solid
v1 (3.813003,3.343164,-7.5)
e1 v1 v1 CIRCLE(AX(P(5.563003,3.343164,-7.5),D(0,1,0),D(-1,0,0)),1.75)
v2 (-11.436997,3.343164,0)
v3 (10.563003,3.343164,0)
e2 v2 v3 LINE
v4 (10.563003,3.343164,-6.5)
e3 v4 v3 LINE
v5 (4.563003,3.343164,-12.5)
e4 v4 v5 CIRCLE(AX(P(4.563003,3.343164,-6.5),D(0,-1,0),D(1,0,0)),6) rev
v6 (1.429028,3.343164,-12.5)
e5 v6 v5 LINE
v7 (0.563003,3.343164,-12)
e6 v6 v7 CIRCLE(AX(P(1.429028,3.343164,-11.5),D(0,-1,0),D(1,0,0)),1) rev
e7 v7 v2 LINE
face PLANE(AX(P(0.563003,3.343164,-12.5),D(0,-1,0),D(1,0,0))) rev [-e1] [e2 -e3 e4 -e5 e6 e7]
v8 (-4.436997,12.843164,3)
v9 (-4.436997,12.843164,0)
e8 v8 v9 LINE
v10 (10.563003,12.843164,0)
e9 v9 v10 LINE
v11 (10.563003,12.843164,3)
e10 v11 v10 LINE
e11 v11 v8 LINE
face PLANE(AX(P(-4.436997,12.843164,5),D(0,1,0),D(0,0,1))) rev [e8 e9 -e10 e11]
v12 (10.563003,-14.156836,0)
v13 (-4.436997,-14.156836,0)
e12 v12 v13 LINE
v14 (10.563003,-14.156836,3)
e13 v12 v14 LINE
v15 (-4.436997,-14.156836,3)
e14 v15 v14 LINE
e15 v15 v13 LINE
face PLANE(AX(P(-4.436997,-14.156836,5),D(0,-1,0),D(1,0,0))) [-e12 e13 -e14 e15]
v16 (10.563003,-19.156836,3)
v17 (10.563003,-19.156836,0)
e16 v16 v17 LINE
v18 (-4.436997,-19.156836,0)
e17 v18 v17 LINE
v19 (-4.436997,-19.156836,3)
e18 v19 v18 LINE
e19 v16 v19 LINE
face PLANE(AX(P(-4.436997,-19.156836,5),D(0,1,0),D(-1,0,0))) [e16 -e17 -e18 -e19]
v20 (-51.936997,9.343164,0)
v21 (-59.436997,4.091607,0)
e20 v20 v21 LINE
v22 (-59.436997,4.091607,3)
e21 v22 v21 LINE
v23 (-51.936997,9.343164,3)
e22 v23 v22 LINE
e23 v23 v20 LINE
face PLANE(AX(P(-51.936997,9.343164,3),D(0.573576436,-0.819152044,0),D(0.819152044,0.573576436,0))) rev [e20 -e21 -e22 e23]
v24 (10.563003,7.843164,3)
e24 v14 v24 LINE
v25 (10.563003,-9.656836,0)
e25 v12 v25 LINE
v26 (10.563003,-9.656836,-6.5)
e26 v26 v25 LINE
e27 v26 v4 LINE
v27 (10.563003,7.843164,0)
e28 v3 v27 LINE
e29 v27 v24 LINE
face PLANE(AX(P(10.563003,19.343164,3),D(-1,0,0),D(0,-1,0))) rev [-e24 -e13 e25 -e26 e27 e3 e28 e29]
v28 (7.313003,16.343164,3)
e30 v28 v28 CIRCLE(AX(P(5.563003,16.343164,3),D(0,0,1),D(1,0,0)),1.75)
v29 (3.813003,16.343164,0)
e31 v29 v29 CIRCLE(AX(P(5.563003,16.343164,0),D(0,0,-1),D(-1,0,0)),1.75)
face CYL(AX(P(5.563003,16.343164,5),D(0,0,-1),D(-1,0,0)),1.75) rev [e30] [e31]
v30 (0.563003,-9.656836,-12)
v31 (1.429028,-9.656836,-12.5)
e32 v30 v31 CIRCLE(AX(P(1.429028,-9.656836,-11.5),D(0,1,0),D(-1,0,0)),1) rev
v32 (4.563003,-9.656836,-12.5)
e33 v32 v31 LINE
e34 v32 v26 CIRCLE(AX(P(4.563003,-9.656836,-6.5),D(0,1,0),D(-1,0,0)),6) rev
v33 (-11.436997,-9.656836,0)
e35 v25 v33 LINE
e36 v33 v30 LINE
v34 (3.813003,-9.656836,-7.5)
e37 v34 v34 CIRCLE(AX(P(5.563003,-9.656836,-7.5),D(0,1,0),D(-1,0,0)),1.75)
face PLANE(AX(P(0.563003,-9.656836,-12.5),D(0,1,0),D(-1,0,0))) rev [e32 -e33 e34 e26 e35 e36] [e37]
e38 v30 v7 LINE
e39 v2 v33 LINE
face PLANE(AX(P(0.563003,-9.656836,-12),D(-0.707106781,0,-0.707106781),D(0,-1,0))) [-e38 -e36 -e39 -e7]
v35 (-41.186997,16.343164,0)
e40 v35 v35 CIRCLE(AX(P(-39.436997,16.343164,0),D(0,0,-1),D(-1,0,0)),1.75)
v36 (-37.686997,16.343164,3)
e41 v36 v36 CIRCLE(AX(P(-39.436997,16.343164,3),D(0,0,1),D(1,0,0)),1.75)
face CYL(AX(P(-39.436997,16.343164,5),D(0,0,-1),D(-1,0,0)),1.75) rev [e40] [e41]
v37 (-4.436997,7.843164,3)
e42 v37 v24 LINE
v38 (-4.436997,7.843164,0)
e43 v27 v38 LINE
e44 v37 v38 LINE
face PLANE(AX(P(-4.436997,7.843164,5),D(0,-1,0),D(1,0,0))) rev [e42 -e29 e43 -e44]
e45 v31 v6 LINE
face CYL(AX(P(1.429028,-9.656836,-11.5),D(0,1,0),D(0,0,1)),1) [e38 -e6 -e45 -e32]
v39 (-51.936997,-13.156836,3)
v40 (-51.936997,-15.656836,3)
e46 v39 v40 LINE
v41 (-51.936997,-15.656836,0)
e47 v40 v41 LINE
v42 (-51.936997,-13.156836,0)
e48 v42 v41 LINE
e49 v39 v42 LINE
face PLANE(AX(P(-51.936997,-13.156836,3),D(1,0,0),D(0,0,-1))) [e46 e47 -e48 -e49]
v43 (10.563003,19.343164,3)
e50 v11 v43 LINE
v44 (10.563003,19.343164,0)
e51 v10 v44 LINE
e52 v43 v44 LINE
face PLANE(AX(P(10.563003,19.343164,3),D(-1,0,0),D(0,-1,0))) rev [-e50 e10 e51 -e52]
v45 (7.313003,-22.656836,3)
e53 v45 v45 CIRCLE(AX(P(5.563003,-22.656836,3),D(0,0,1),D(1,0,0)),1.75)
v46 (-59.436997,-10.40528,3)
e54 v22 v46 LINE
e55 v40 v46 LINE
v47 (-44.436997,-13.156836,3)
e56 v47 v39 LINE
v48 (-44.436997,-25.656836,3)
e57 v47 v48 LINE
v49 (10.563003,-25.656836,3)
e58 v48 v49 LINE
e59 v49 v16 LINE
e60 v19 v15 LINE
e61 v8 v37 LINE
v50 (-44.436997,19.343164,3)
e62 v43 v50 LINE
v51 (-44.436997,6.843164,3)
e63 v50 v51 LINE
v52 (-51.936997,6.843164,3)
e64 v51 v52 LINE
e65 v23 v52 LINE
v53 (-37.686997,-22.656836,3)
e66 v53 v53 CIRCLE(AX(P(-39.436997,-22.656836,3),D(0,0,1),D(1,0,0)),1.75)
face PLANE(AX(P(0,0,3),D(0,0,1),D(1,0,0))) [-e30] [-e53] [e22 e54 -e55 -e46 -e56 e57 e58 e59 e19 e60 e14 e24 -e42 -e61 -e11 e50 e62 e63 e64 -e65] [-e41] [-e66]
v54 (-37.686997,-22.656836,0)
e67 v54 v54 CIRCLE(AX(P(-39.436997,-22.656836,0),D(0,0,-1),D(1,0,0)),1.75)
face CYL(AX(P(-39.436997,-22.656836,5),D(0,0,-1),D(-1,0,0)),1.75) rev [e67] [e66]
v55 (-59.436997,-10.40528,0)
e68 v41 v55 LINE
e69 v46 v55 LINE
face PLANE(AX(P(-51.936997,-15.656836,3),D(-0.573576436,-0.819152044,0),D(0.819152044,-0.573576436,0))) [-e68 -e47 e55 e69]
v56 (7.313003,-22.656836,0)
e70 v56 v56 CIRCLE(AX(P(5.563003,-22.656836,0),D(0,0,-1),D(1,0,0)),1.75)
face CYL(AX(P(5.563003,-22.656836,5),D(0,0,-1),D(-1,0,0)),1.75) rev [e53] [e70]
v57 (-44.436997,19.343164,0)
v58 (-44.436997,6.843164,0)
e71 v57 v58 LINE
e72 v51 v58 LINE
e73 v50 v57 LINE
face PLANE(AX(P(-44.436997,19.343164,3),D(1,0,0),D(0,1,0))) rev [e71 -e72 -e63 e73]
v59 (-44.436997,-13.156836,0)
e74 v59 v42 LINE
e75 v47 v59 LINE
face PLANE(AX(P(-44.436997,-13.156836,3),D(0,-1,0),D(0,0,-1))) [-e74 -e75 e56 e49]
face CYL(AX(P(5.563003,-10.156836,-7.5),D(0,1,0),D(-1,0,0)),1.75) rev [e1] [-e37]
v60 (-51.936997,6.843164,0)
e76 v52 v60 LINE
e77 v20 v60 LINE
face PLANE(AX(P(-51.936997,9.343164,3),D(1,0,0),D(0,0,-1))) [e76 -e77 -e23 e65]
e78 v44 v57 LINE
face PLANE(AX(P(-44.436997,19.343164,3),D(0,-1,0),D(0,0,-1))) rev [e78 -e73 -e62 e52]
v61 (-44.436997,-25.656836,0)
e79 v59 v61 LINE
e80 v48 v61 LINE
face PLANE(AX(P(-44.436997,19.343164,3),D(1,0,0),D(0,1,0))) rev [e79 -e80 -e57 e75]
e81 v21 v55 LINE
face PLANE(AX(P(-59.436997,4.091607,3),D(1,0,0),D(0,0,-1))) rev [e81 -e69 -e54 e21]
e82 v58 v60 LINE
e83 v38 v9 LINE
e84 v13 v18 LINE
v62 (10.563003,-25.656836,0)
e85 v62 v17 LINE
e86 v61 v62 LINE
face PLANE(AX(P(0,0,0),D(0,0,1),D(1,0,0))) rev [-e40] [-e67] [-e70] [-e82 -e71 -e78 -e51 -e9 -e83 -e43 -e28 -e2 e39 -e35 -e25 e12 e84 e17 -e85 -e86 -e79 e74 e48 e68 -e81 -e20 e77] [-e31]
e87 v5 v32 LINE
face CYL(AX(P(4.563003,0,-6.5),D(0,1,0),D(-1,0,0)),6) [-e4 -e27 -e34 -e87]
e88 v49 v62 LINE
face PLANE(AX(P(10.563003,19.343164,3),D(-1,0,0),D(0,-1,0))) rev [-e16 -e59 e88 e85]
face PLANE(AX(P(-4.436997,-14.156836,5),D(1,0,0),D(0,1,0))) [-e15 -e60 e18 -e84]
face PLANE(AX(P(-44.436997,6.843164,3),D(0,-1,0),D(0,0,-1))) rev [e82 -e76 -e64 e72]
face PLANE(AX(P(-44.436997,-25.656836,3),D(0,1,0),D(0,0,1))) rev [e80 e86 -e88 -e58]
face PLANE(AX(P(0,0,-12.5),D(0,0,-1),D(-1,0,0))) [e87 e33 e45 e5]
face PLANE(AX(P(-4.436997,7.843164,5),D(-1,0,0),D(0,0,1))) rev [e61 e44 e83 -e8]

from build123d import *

# Parameters (mm, degrees)
SKETCH1_W           = 55
SKETCH1_H           = 45
BOSS_EXTRUDE1_DEPTH = 3
SKETCH2_W           = 10
SKETCH2_H           = 13
BOSS_EXTRUDE2_DEPTH = 12.5
SKETCH3_R           = 1.75
CUT_EXTRUDE1_DEPTH  = 13.5
FILLET1_R           = 6
CHAMFER1_SIZE       = 12
FILLET3_R           = 1
SKETCH4_W           = 20
SKETCH4_H           = 5
CUT_EXTRUDE3_DEPTH  = 5
SKETCH7_R           = 1.75
CUT_EXTRUDE4_DEPTH  = 5
BOSS_EXTRUDE4_DEPTH = 3


with BuildPart() as part:
    # Sketch1 → Boss-Extrude1 (new body)
    with BuildSketch(Plane.XY):
        with Locations((-16.936997319, -3.156836461)):
            Rectangle(SKETCH1_W, SKETCH1_H)
    extrude(amount=BOSS_EXTRUDE1_DEPTH)

    # Sketch2 → Boss-Extrude2 (add)
    with BuildSketch(Plane(origin=(0, 0, 0), x_dir=(-1, 0, 0), z_dir=(0, 0, -1))):
        with Locations((-5.563002681, -3.156836461)):
            Rectangle(SKETCH2_W, SKETCH2_H)
    extrude(amount=BOSS_EXTRUDE2_DEPTH)

    # Sketch3 → Cut-Extrude1 (cut)
    with BuildSketch(Plane(origin=(0, 3.343163539, 0), x_dir=(1, 0, 0), z_dir=(0, 1, 0))):
        with Locations(Location((5.563002681, 7.5, 0), (0, 0, 180))):
            Circle(SKETCH3_R)
    extrude(amount=-CUT_EXTRUDE1_DEPTH, mode=Mode.SUBTRACT)

    # Fillet1
    fillet1_edges = [part.edges().sort_by_distance(p)[0] for p in [
        (10.563002681, -3.156836461, -12.5),
    ]]
    fillet(fillet1_edges, radius=FILLET1_R)

    # Chamfer1
    chamfer1_edges = [part.edges().sort_by_distance(p)[0] for p in [
        (0.563002681, -3.156836461, 0),
    ]]
    chamfer(chamfer1_edges, length=CHAMFER1_SIZE)

    # Fillet3
    # the kernel refuses this fillet: 1 mm, written as the material it takes off along each edge
    with BuildSketch(Plane(origin=(0.563002681, 5.508227048, -12.5), x_dir=(1, 0, 0), z_dir=(0, -1, 0))) as fillet3_piece_1:
        with BuildLine():
            CenterArc((0.866025404, 1), FILLET3_R, 210, 60)
            Line((0, 0.5), (-0.017320508, 0.49))
            ThreePointArc((-0.017320508, 0.49), (-0.02, 0.25), (-0.02, 0))
            Line((-0.02, 0), (0, -0.02))
            Line((0, -0.02), (0.866025404, -0.02))
            Line((0.866025404, -0.02), (0.866025404, 0))
        make_face()
    extrude(amount=17.330127019, mode=Mode.SUBTRACT)

    # Sketch4 → Cut-Extrude3 (cut)
    with BuildSketch(Plane(origin=(0, 0, 0), x_dir=(-1, 0, 0), z_dir=(0, 0, -1))):
        with Locations((-5.563002681, 10.343163539)):
            Rectangle(SKETCH4_W, SKETCH4_H)
    cut_extrude3 = extrude(amount=-CUT_EXTRUDE3_DEPTH, mode=Mode.SUBTRACT)

    # Mirror2: Cut-Extrude3 across plane
    add(cut_extrude3.mirror(Plane.ZX.offset(-3.156836461)), mode=Mode.SUBTRACT)

    # Sketch7 → Cut-Extrude4 (cut)
    with BuildSketch(Plane(origin=(0, 0, 0), x_dir=(-1, 0, 0), z_dir=(0, 0, -1))):
        with Locations((-5.563002681, 16.343163539)):
            Circle(SKETCH7_R)
        with Locations((39.436997319, 16.343163539)):
            Circle(SKETCH7_R)
        with Locations(Location((39.436997319, -22.656836461, 0), (0, 0, 180))):
            Circle(SKETCH7_R)
        with Locations(Location((-5.563002681, -22.656836461, 0), (0, 0, 180))):
            Circle(SKETCH7_R)
    extrude(amount=-CUT_EXTRUDE4_DEPTH, mode=Mode.SUBTRACT)

    # Sketch8 → Boss-Extrude4 (add)
    with BuildSketch(Plane(origin=(0, 0, 0), x_dir=(-1, 0, 0), z_dir=(0, 0, -1))):
        Polygon((44.436997319, 6.843163539), (51.936997319, 6.843163539), (51.936997319, 9.343163539), (59.436997319, 4.091607002), (59.436997319, -10.405279925), (51.936997319, -15.656836461), (51.936997319, -13.156836461), (44.436997319, -13.156836461), align=None)
    extrude(amount=-BOSS_EXTRUDE4_DEPTH)


solid = part.part
